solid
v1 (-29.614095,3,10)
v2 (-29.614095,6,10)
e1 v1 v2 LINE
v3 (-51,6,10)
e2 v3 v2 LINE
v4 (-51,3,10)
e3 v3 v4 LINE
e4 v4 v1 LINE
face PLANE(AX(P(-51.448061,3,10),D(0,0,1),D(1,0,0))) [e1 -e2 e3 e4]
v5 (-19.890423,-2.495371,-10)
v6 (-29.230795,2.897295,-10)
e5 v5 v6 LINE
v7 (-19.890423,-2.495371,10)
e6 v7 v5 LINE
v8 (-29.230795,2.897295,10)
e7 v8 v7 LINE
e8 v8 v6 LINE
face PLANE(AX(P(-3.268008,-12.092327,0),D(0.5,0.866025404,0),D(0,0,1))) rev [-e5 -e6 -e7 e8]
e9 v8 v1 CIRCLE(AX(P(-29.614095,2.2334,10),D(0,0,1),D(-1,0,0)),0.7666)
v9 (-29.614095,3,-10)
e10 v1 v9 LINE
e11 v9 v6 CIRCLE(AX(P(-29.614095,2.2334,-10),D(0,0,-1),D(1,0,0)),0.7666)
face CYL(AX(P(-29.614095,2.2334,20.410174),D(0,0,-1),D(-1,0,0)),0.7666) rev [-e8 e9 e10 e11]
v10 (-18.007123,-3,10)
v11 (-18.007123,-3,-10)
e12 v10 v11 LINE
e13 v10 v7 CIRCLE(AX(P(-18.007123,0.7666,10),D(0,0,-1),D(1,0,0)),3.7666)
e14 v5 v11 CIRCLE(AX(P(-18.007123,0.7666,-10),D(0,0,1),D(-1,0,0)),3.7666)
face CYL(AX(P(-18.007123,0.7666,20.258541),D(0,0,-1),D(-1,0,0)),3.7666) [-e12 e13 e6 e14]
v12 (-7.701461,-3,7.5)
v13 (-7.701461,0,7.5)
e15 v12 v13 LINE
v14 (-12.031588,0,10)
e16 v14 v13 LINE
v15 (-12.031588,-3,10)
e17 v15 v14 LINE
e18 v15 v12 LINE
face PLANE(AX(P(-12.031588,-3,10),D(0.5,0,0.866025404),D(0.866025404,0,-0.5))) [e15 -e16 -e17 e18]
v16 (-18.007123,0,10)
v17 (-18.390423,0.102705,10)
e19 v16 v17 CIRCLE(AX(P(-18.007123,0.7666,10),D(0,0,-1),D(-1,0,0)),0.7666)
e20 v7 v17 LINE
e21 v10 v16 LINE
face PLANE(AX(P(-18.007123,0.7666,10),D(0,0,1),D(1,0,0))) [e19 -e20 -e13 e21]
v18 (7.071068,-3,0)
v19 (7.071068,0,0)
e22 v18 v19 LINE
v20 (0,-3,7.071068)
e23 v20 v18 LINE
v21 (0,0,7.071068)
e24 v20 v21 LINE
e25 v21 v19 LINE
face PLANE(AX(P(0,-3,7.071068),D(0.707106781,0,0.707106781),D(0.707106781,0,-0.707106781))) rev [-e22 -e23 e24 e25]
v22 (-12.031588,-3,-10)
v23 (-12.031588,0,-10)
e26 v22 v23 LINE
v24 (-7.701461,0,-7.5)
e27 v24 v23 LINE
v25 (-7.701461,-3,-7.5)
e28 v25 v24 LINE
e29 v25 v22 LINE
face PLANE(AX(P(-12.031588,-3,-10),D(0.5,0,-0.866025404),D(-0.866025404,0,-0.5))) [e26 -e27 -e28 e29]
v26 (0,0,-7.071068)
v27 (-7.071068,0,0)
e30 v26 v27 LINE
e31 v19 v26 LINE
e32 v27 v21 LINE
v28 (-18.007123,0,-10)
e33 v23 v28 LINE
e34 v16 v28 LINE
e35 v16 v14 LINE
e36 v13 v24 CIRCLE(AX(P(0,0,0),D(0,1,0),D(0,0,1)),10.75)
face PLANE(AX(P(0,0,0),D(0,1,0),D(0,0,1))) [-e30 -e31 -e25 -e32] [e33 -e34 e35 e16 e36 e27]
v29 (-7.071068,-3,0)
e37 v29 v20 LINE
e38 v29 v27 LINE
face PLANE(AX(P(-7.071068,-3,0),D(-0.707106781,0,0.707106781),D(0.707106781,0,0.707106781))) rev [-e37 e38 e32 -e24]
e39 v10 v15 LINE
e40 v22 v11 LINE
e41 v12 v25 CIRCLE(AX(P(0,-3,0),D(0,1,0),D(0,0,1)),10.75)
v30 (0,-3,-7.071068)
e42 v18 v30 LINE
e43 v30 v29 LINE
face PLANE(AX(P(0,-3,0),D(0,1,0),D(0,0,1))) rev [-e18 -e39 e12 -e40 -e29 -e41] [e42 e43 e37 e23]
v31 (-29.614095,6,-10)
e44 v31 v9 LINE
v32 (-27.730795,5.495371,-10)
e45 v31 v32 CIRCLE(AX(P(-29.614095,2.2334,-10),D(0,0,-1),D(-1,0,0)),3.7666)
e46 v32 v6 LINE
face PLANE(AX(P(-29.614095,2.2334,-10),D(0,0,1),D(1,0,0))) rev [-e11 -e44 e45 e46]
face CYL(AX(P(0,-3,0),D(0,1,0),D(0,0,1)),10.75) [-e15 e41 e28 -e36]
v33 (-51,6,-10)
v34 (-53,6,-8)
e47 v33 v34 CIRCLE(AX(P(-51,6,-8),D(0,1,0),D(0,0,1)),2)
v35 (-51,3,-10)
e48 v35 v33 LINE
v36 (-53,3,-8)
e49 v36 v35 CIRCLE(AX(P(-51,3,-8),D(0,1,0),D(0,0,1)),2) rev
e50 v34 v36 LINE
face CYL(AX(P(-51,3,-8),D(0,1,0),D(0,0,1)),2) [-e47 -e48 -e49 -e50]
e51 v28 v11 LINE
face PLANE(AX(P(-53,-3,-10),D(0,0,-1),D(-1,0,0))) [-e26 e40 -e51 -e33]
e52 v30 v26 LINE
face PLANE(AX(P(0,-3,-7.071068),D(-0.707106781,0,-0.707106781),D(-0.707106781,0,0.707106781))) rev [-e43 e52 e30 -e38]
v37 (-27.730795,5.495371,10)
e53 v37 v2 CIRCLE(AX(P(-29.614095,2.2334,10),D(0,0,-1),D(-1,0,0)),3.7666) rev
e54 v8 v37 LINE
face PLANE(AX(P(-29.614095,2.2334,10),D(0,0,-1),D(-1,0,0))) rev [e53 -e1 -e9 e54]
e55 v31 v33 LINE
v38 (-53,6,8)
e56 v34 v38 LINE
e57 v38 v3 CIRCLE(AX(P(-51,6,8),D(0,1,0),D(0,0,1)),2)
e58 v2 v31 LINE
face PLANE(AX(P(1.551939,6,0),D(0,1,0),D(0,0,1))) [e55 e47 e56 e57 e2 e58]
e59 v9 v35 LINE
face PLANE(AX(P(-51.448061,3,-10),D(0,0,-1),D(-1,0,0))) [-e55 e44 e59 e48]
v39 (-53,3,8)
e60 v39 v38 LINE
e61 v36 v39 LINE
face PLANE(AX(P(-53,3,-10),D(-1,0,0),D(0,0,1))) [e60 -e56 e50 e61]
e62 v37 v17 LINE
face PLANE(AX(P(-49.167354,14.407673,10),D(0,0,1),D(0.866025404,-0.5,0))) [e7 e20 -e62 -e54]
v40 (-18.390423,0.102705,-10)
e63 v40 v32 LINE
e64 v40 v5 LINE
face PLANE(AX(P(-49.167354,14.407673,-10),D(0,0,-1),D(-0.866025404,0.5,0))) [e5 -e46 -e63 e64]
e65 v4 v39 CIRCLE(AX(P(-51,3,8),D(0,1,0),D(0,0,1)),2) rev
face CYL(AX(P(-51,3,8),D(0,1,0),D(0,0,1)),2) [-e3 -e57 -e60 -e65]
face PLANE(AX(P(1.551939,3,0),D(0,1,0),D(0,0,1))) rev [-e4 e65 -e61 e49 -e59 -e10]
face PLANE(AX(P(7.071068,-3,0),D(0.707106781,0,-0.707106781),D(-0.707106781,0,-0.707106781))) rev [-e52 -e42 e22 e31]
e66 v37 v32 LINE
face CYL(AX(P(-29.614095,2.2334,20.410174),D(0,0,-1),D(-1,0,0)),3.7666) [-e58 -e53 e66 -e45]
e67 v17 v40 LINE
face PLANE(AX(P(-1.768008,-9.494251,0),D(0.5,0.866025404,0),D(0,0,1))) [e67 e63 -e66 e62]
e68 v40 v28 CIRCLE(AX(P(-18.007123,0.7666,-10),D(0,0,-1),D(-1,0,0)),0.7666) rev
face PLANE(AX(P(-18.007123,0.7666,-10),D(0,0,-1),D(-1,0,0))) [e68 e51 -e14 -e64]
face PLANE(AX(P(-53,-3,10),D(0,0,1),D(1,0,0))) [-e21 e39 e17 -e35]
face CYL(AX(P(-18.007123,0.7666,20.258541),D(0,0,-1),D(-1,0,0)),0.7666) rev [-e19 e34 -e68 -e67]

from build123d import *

# Parameters (mm, degrees)
SM_BASE_FLANGE_1_DEPTH = 3
OTHER_START            = -10
OTHER_1_DEPTH          = 20
OTHER_1_2_DEPTH        = 20
CUT_EXTRUDE_1_DEPTH    = 55.411051267
FILLET_1_R             = 2


# Read off the part's stored shape, not the designer's step: 转折1
# Sheet-metal steps are written as plain solids
with BuildPart() as part:
    # Sketch 2 → 基体-法兰1 (new body)
    with BuildSketch(Plane(origin=(0, 0, 0), x_dir=(1, 0, 0), z_dir=(0, 1, 0))):
        with BuildLine():
            Line((-12.031587919, -10), (-7.7014609, -7.5))
            ThreePointArc((-7.7014609, -7.5), (10.75, 0), (-7.7014609, 7.5))
            Line((-7.7014609, 7.5), (-12.031587919, 10))
            Line((-12.031587919, 10), (-53, 10))
            Line((-53, 10), (-53, -10))
            Line((-53, -10), (-12.031587919, -10))
        make_face()
    extrude(amount=-SM_BASE_FLANGE_1_DEPTH)

    # Other 1 outline → Other 1 (cut)
    with BuildSketch(Plane.XY.offset(OTHER_START)):
        with BuildLine():
            ThreePointArc((-18.007123317, -3), (-18.981991132, -2.871656217), (-19.890423317, -2.495371286))
            Line((-19.890423317, -2.495371286), (-24.212533168, 0))
            Line((-24.212533168, 0), (-53, 0))
            Line((-53, 0), (-53, -3))
            Line((-53, -3), (-18.007123317, -3))
        make_face()
    extrude(amount=OTHER_1_DEPTH, mode=Mode.SUBTRACT)

    # Other 1 2 outline → Other 1 2 (add)
    with BuildSketch(Plane.XY.offset(OTHER_START)):
        with BuildLine():
            Line((-29.230795442, 2.897295075), (-24.212533168, 0))
            Line((-24.212533168, 0), (-18.007123317, 0))
            ThreePointArc((-18.007123317, 0), (-18.205533997, 0.026121262), (-18.390423317, 0.102704925))
            Line((-18.390423317, 0.102704925), (-27.730795442, 5.495371286))
            ThreePointArc((-27.730795442, 5.495371286), (-28.639227627, 5.871656217), (-29.614095442, 6))
            Line((-29.614095442, 6), (-53, 6))
            Line((-53, 6), (-53, 3))
            Line((-53, 3), (-29.614095442, 3))
            ThreePointArc((-29.614095442, 3), (-29.415684762, 2.973878738), (-29.230795442, 2.897295075))
        make_face()
    extrude(amount=OTHER_1_2_DEPTH)

    # 草图8 → 切除-拉伸1 (cut, through all)
    with BuildSketch(Plane(origin=(0, 0, 0), x_dir=(1, 0, 0), z_dir=(0, 1, 0))):
        Polygon((0, 7.071067812), (-7.071067812, 0), (0, -7.071067812), (7.071067812, 0), align=None)
    extrude(amount=-CUT_EXTRUDE_1_DEPTH, mode=Mode.SUBTRACT)

    # 圆角1
    fillet_1_edges = [part.edges().sort_by_distance(p)[0] for p in [
        (-53, 4.5, 10),
        (-53, 4.5, -10),
    ]]
    fillet(fillet_1_edges, radius=FILLET_1_R)


solid = part.part
